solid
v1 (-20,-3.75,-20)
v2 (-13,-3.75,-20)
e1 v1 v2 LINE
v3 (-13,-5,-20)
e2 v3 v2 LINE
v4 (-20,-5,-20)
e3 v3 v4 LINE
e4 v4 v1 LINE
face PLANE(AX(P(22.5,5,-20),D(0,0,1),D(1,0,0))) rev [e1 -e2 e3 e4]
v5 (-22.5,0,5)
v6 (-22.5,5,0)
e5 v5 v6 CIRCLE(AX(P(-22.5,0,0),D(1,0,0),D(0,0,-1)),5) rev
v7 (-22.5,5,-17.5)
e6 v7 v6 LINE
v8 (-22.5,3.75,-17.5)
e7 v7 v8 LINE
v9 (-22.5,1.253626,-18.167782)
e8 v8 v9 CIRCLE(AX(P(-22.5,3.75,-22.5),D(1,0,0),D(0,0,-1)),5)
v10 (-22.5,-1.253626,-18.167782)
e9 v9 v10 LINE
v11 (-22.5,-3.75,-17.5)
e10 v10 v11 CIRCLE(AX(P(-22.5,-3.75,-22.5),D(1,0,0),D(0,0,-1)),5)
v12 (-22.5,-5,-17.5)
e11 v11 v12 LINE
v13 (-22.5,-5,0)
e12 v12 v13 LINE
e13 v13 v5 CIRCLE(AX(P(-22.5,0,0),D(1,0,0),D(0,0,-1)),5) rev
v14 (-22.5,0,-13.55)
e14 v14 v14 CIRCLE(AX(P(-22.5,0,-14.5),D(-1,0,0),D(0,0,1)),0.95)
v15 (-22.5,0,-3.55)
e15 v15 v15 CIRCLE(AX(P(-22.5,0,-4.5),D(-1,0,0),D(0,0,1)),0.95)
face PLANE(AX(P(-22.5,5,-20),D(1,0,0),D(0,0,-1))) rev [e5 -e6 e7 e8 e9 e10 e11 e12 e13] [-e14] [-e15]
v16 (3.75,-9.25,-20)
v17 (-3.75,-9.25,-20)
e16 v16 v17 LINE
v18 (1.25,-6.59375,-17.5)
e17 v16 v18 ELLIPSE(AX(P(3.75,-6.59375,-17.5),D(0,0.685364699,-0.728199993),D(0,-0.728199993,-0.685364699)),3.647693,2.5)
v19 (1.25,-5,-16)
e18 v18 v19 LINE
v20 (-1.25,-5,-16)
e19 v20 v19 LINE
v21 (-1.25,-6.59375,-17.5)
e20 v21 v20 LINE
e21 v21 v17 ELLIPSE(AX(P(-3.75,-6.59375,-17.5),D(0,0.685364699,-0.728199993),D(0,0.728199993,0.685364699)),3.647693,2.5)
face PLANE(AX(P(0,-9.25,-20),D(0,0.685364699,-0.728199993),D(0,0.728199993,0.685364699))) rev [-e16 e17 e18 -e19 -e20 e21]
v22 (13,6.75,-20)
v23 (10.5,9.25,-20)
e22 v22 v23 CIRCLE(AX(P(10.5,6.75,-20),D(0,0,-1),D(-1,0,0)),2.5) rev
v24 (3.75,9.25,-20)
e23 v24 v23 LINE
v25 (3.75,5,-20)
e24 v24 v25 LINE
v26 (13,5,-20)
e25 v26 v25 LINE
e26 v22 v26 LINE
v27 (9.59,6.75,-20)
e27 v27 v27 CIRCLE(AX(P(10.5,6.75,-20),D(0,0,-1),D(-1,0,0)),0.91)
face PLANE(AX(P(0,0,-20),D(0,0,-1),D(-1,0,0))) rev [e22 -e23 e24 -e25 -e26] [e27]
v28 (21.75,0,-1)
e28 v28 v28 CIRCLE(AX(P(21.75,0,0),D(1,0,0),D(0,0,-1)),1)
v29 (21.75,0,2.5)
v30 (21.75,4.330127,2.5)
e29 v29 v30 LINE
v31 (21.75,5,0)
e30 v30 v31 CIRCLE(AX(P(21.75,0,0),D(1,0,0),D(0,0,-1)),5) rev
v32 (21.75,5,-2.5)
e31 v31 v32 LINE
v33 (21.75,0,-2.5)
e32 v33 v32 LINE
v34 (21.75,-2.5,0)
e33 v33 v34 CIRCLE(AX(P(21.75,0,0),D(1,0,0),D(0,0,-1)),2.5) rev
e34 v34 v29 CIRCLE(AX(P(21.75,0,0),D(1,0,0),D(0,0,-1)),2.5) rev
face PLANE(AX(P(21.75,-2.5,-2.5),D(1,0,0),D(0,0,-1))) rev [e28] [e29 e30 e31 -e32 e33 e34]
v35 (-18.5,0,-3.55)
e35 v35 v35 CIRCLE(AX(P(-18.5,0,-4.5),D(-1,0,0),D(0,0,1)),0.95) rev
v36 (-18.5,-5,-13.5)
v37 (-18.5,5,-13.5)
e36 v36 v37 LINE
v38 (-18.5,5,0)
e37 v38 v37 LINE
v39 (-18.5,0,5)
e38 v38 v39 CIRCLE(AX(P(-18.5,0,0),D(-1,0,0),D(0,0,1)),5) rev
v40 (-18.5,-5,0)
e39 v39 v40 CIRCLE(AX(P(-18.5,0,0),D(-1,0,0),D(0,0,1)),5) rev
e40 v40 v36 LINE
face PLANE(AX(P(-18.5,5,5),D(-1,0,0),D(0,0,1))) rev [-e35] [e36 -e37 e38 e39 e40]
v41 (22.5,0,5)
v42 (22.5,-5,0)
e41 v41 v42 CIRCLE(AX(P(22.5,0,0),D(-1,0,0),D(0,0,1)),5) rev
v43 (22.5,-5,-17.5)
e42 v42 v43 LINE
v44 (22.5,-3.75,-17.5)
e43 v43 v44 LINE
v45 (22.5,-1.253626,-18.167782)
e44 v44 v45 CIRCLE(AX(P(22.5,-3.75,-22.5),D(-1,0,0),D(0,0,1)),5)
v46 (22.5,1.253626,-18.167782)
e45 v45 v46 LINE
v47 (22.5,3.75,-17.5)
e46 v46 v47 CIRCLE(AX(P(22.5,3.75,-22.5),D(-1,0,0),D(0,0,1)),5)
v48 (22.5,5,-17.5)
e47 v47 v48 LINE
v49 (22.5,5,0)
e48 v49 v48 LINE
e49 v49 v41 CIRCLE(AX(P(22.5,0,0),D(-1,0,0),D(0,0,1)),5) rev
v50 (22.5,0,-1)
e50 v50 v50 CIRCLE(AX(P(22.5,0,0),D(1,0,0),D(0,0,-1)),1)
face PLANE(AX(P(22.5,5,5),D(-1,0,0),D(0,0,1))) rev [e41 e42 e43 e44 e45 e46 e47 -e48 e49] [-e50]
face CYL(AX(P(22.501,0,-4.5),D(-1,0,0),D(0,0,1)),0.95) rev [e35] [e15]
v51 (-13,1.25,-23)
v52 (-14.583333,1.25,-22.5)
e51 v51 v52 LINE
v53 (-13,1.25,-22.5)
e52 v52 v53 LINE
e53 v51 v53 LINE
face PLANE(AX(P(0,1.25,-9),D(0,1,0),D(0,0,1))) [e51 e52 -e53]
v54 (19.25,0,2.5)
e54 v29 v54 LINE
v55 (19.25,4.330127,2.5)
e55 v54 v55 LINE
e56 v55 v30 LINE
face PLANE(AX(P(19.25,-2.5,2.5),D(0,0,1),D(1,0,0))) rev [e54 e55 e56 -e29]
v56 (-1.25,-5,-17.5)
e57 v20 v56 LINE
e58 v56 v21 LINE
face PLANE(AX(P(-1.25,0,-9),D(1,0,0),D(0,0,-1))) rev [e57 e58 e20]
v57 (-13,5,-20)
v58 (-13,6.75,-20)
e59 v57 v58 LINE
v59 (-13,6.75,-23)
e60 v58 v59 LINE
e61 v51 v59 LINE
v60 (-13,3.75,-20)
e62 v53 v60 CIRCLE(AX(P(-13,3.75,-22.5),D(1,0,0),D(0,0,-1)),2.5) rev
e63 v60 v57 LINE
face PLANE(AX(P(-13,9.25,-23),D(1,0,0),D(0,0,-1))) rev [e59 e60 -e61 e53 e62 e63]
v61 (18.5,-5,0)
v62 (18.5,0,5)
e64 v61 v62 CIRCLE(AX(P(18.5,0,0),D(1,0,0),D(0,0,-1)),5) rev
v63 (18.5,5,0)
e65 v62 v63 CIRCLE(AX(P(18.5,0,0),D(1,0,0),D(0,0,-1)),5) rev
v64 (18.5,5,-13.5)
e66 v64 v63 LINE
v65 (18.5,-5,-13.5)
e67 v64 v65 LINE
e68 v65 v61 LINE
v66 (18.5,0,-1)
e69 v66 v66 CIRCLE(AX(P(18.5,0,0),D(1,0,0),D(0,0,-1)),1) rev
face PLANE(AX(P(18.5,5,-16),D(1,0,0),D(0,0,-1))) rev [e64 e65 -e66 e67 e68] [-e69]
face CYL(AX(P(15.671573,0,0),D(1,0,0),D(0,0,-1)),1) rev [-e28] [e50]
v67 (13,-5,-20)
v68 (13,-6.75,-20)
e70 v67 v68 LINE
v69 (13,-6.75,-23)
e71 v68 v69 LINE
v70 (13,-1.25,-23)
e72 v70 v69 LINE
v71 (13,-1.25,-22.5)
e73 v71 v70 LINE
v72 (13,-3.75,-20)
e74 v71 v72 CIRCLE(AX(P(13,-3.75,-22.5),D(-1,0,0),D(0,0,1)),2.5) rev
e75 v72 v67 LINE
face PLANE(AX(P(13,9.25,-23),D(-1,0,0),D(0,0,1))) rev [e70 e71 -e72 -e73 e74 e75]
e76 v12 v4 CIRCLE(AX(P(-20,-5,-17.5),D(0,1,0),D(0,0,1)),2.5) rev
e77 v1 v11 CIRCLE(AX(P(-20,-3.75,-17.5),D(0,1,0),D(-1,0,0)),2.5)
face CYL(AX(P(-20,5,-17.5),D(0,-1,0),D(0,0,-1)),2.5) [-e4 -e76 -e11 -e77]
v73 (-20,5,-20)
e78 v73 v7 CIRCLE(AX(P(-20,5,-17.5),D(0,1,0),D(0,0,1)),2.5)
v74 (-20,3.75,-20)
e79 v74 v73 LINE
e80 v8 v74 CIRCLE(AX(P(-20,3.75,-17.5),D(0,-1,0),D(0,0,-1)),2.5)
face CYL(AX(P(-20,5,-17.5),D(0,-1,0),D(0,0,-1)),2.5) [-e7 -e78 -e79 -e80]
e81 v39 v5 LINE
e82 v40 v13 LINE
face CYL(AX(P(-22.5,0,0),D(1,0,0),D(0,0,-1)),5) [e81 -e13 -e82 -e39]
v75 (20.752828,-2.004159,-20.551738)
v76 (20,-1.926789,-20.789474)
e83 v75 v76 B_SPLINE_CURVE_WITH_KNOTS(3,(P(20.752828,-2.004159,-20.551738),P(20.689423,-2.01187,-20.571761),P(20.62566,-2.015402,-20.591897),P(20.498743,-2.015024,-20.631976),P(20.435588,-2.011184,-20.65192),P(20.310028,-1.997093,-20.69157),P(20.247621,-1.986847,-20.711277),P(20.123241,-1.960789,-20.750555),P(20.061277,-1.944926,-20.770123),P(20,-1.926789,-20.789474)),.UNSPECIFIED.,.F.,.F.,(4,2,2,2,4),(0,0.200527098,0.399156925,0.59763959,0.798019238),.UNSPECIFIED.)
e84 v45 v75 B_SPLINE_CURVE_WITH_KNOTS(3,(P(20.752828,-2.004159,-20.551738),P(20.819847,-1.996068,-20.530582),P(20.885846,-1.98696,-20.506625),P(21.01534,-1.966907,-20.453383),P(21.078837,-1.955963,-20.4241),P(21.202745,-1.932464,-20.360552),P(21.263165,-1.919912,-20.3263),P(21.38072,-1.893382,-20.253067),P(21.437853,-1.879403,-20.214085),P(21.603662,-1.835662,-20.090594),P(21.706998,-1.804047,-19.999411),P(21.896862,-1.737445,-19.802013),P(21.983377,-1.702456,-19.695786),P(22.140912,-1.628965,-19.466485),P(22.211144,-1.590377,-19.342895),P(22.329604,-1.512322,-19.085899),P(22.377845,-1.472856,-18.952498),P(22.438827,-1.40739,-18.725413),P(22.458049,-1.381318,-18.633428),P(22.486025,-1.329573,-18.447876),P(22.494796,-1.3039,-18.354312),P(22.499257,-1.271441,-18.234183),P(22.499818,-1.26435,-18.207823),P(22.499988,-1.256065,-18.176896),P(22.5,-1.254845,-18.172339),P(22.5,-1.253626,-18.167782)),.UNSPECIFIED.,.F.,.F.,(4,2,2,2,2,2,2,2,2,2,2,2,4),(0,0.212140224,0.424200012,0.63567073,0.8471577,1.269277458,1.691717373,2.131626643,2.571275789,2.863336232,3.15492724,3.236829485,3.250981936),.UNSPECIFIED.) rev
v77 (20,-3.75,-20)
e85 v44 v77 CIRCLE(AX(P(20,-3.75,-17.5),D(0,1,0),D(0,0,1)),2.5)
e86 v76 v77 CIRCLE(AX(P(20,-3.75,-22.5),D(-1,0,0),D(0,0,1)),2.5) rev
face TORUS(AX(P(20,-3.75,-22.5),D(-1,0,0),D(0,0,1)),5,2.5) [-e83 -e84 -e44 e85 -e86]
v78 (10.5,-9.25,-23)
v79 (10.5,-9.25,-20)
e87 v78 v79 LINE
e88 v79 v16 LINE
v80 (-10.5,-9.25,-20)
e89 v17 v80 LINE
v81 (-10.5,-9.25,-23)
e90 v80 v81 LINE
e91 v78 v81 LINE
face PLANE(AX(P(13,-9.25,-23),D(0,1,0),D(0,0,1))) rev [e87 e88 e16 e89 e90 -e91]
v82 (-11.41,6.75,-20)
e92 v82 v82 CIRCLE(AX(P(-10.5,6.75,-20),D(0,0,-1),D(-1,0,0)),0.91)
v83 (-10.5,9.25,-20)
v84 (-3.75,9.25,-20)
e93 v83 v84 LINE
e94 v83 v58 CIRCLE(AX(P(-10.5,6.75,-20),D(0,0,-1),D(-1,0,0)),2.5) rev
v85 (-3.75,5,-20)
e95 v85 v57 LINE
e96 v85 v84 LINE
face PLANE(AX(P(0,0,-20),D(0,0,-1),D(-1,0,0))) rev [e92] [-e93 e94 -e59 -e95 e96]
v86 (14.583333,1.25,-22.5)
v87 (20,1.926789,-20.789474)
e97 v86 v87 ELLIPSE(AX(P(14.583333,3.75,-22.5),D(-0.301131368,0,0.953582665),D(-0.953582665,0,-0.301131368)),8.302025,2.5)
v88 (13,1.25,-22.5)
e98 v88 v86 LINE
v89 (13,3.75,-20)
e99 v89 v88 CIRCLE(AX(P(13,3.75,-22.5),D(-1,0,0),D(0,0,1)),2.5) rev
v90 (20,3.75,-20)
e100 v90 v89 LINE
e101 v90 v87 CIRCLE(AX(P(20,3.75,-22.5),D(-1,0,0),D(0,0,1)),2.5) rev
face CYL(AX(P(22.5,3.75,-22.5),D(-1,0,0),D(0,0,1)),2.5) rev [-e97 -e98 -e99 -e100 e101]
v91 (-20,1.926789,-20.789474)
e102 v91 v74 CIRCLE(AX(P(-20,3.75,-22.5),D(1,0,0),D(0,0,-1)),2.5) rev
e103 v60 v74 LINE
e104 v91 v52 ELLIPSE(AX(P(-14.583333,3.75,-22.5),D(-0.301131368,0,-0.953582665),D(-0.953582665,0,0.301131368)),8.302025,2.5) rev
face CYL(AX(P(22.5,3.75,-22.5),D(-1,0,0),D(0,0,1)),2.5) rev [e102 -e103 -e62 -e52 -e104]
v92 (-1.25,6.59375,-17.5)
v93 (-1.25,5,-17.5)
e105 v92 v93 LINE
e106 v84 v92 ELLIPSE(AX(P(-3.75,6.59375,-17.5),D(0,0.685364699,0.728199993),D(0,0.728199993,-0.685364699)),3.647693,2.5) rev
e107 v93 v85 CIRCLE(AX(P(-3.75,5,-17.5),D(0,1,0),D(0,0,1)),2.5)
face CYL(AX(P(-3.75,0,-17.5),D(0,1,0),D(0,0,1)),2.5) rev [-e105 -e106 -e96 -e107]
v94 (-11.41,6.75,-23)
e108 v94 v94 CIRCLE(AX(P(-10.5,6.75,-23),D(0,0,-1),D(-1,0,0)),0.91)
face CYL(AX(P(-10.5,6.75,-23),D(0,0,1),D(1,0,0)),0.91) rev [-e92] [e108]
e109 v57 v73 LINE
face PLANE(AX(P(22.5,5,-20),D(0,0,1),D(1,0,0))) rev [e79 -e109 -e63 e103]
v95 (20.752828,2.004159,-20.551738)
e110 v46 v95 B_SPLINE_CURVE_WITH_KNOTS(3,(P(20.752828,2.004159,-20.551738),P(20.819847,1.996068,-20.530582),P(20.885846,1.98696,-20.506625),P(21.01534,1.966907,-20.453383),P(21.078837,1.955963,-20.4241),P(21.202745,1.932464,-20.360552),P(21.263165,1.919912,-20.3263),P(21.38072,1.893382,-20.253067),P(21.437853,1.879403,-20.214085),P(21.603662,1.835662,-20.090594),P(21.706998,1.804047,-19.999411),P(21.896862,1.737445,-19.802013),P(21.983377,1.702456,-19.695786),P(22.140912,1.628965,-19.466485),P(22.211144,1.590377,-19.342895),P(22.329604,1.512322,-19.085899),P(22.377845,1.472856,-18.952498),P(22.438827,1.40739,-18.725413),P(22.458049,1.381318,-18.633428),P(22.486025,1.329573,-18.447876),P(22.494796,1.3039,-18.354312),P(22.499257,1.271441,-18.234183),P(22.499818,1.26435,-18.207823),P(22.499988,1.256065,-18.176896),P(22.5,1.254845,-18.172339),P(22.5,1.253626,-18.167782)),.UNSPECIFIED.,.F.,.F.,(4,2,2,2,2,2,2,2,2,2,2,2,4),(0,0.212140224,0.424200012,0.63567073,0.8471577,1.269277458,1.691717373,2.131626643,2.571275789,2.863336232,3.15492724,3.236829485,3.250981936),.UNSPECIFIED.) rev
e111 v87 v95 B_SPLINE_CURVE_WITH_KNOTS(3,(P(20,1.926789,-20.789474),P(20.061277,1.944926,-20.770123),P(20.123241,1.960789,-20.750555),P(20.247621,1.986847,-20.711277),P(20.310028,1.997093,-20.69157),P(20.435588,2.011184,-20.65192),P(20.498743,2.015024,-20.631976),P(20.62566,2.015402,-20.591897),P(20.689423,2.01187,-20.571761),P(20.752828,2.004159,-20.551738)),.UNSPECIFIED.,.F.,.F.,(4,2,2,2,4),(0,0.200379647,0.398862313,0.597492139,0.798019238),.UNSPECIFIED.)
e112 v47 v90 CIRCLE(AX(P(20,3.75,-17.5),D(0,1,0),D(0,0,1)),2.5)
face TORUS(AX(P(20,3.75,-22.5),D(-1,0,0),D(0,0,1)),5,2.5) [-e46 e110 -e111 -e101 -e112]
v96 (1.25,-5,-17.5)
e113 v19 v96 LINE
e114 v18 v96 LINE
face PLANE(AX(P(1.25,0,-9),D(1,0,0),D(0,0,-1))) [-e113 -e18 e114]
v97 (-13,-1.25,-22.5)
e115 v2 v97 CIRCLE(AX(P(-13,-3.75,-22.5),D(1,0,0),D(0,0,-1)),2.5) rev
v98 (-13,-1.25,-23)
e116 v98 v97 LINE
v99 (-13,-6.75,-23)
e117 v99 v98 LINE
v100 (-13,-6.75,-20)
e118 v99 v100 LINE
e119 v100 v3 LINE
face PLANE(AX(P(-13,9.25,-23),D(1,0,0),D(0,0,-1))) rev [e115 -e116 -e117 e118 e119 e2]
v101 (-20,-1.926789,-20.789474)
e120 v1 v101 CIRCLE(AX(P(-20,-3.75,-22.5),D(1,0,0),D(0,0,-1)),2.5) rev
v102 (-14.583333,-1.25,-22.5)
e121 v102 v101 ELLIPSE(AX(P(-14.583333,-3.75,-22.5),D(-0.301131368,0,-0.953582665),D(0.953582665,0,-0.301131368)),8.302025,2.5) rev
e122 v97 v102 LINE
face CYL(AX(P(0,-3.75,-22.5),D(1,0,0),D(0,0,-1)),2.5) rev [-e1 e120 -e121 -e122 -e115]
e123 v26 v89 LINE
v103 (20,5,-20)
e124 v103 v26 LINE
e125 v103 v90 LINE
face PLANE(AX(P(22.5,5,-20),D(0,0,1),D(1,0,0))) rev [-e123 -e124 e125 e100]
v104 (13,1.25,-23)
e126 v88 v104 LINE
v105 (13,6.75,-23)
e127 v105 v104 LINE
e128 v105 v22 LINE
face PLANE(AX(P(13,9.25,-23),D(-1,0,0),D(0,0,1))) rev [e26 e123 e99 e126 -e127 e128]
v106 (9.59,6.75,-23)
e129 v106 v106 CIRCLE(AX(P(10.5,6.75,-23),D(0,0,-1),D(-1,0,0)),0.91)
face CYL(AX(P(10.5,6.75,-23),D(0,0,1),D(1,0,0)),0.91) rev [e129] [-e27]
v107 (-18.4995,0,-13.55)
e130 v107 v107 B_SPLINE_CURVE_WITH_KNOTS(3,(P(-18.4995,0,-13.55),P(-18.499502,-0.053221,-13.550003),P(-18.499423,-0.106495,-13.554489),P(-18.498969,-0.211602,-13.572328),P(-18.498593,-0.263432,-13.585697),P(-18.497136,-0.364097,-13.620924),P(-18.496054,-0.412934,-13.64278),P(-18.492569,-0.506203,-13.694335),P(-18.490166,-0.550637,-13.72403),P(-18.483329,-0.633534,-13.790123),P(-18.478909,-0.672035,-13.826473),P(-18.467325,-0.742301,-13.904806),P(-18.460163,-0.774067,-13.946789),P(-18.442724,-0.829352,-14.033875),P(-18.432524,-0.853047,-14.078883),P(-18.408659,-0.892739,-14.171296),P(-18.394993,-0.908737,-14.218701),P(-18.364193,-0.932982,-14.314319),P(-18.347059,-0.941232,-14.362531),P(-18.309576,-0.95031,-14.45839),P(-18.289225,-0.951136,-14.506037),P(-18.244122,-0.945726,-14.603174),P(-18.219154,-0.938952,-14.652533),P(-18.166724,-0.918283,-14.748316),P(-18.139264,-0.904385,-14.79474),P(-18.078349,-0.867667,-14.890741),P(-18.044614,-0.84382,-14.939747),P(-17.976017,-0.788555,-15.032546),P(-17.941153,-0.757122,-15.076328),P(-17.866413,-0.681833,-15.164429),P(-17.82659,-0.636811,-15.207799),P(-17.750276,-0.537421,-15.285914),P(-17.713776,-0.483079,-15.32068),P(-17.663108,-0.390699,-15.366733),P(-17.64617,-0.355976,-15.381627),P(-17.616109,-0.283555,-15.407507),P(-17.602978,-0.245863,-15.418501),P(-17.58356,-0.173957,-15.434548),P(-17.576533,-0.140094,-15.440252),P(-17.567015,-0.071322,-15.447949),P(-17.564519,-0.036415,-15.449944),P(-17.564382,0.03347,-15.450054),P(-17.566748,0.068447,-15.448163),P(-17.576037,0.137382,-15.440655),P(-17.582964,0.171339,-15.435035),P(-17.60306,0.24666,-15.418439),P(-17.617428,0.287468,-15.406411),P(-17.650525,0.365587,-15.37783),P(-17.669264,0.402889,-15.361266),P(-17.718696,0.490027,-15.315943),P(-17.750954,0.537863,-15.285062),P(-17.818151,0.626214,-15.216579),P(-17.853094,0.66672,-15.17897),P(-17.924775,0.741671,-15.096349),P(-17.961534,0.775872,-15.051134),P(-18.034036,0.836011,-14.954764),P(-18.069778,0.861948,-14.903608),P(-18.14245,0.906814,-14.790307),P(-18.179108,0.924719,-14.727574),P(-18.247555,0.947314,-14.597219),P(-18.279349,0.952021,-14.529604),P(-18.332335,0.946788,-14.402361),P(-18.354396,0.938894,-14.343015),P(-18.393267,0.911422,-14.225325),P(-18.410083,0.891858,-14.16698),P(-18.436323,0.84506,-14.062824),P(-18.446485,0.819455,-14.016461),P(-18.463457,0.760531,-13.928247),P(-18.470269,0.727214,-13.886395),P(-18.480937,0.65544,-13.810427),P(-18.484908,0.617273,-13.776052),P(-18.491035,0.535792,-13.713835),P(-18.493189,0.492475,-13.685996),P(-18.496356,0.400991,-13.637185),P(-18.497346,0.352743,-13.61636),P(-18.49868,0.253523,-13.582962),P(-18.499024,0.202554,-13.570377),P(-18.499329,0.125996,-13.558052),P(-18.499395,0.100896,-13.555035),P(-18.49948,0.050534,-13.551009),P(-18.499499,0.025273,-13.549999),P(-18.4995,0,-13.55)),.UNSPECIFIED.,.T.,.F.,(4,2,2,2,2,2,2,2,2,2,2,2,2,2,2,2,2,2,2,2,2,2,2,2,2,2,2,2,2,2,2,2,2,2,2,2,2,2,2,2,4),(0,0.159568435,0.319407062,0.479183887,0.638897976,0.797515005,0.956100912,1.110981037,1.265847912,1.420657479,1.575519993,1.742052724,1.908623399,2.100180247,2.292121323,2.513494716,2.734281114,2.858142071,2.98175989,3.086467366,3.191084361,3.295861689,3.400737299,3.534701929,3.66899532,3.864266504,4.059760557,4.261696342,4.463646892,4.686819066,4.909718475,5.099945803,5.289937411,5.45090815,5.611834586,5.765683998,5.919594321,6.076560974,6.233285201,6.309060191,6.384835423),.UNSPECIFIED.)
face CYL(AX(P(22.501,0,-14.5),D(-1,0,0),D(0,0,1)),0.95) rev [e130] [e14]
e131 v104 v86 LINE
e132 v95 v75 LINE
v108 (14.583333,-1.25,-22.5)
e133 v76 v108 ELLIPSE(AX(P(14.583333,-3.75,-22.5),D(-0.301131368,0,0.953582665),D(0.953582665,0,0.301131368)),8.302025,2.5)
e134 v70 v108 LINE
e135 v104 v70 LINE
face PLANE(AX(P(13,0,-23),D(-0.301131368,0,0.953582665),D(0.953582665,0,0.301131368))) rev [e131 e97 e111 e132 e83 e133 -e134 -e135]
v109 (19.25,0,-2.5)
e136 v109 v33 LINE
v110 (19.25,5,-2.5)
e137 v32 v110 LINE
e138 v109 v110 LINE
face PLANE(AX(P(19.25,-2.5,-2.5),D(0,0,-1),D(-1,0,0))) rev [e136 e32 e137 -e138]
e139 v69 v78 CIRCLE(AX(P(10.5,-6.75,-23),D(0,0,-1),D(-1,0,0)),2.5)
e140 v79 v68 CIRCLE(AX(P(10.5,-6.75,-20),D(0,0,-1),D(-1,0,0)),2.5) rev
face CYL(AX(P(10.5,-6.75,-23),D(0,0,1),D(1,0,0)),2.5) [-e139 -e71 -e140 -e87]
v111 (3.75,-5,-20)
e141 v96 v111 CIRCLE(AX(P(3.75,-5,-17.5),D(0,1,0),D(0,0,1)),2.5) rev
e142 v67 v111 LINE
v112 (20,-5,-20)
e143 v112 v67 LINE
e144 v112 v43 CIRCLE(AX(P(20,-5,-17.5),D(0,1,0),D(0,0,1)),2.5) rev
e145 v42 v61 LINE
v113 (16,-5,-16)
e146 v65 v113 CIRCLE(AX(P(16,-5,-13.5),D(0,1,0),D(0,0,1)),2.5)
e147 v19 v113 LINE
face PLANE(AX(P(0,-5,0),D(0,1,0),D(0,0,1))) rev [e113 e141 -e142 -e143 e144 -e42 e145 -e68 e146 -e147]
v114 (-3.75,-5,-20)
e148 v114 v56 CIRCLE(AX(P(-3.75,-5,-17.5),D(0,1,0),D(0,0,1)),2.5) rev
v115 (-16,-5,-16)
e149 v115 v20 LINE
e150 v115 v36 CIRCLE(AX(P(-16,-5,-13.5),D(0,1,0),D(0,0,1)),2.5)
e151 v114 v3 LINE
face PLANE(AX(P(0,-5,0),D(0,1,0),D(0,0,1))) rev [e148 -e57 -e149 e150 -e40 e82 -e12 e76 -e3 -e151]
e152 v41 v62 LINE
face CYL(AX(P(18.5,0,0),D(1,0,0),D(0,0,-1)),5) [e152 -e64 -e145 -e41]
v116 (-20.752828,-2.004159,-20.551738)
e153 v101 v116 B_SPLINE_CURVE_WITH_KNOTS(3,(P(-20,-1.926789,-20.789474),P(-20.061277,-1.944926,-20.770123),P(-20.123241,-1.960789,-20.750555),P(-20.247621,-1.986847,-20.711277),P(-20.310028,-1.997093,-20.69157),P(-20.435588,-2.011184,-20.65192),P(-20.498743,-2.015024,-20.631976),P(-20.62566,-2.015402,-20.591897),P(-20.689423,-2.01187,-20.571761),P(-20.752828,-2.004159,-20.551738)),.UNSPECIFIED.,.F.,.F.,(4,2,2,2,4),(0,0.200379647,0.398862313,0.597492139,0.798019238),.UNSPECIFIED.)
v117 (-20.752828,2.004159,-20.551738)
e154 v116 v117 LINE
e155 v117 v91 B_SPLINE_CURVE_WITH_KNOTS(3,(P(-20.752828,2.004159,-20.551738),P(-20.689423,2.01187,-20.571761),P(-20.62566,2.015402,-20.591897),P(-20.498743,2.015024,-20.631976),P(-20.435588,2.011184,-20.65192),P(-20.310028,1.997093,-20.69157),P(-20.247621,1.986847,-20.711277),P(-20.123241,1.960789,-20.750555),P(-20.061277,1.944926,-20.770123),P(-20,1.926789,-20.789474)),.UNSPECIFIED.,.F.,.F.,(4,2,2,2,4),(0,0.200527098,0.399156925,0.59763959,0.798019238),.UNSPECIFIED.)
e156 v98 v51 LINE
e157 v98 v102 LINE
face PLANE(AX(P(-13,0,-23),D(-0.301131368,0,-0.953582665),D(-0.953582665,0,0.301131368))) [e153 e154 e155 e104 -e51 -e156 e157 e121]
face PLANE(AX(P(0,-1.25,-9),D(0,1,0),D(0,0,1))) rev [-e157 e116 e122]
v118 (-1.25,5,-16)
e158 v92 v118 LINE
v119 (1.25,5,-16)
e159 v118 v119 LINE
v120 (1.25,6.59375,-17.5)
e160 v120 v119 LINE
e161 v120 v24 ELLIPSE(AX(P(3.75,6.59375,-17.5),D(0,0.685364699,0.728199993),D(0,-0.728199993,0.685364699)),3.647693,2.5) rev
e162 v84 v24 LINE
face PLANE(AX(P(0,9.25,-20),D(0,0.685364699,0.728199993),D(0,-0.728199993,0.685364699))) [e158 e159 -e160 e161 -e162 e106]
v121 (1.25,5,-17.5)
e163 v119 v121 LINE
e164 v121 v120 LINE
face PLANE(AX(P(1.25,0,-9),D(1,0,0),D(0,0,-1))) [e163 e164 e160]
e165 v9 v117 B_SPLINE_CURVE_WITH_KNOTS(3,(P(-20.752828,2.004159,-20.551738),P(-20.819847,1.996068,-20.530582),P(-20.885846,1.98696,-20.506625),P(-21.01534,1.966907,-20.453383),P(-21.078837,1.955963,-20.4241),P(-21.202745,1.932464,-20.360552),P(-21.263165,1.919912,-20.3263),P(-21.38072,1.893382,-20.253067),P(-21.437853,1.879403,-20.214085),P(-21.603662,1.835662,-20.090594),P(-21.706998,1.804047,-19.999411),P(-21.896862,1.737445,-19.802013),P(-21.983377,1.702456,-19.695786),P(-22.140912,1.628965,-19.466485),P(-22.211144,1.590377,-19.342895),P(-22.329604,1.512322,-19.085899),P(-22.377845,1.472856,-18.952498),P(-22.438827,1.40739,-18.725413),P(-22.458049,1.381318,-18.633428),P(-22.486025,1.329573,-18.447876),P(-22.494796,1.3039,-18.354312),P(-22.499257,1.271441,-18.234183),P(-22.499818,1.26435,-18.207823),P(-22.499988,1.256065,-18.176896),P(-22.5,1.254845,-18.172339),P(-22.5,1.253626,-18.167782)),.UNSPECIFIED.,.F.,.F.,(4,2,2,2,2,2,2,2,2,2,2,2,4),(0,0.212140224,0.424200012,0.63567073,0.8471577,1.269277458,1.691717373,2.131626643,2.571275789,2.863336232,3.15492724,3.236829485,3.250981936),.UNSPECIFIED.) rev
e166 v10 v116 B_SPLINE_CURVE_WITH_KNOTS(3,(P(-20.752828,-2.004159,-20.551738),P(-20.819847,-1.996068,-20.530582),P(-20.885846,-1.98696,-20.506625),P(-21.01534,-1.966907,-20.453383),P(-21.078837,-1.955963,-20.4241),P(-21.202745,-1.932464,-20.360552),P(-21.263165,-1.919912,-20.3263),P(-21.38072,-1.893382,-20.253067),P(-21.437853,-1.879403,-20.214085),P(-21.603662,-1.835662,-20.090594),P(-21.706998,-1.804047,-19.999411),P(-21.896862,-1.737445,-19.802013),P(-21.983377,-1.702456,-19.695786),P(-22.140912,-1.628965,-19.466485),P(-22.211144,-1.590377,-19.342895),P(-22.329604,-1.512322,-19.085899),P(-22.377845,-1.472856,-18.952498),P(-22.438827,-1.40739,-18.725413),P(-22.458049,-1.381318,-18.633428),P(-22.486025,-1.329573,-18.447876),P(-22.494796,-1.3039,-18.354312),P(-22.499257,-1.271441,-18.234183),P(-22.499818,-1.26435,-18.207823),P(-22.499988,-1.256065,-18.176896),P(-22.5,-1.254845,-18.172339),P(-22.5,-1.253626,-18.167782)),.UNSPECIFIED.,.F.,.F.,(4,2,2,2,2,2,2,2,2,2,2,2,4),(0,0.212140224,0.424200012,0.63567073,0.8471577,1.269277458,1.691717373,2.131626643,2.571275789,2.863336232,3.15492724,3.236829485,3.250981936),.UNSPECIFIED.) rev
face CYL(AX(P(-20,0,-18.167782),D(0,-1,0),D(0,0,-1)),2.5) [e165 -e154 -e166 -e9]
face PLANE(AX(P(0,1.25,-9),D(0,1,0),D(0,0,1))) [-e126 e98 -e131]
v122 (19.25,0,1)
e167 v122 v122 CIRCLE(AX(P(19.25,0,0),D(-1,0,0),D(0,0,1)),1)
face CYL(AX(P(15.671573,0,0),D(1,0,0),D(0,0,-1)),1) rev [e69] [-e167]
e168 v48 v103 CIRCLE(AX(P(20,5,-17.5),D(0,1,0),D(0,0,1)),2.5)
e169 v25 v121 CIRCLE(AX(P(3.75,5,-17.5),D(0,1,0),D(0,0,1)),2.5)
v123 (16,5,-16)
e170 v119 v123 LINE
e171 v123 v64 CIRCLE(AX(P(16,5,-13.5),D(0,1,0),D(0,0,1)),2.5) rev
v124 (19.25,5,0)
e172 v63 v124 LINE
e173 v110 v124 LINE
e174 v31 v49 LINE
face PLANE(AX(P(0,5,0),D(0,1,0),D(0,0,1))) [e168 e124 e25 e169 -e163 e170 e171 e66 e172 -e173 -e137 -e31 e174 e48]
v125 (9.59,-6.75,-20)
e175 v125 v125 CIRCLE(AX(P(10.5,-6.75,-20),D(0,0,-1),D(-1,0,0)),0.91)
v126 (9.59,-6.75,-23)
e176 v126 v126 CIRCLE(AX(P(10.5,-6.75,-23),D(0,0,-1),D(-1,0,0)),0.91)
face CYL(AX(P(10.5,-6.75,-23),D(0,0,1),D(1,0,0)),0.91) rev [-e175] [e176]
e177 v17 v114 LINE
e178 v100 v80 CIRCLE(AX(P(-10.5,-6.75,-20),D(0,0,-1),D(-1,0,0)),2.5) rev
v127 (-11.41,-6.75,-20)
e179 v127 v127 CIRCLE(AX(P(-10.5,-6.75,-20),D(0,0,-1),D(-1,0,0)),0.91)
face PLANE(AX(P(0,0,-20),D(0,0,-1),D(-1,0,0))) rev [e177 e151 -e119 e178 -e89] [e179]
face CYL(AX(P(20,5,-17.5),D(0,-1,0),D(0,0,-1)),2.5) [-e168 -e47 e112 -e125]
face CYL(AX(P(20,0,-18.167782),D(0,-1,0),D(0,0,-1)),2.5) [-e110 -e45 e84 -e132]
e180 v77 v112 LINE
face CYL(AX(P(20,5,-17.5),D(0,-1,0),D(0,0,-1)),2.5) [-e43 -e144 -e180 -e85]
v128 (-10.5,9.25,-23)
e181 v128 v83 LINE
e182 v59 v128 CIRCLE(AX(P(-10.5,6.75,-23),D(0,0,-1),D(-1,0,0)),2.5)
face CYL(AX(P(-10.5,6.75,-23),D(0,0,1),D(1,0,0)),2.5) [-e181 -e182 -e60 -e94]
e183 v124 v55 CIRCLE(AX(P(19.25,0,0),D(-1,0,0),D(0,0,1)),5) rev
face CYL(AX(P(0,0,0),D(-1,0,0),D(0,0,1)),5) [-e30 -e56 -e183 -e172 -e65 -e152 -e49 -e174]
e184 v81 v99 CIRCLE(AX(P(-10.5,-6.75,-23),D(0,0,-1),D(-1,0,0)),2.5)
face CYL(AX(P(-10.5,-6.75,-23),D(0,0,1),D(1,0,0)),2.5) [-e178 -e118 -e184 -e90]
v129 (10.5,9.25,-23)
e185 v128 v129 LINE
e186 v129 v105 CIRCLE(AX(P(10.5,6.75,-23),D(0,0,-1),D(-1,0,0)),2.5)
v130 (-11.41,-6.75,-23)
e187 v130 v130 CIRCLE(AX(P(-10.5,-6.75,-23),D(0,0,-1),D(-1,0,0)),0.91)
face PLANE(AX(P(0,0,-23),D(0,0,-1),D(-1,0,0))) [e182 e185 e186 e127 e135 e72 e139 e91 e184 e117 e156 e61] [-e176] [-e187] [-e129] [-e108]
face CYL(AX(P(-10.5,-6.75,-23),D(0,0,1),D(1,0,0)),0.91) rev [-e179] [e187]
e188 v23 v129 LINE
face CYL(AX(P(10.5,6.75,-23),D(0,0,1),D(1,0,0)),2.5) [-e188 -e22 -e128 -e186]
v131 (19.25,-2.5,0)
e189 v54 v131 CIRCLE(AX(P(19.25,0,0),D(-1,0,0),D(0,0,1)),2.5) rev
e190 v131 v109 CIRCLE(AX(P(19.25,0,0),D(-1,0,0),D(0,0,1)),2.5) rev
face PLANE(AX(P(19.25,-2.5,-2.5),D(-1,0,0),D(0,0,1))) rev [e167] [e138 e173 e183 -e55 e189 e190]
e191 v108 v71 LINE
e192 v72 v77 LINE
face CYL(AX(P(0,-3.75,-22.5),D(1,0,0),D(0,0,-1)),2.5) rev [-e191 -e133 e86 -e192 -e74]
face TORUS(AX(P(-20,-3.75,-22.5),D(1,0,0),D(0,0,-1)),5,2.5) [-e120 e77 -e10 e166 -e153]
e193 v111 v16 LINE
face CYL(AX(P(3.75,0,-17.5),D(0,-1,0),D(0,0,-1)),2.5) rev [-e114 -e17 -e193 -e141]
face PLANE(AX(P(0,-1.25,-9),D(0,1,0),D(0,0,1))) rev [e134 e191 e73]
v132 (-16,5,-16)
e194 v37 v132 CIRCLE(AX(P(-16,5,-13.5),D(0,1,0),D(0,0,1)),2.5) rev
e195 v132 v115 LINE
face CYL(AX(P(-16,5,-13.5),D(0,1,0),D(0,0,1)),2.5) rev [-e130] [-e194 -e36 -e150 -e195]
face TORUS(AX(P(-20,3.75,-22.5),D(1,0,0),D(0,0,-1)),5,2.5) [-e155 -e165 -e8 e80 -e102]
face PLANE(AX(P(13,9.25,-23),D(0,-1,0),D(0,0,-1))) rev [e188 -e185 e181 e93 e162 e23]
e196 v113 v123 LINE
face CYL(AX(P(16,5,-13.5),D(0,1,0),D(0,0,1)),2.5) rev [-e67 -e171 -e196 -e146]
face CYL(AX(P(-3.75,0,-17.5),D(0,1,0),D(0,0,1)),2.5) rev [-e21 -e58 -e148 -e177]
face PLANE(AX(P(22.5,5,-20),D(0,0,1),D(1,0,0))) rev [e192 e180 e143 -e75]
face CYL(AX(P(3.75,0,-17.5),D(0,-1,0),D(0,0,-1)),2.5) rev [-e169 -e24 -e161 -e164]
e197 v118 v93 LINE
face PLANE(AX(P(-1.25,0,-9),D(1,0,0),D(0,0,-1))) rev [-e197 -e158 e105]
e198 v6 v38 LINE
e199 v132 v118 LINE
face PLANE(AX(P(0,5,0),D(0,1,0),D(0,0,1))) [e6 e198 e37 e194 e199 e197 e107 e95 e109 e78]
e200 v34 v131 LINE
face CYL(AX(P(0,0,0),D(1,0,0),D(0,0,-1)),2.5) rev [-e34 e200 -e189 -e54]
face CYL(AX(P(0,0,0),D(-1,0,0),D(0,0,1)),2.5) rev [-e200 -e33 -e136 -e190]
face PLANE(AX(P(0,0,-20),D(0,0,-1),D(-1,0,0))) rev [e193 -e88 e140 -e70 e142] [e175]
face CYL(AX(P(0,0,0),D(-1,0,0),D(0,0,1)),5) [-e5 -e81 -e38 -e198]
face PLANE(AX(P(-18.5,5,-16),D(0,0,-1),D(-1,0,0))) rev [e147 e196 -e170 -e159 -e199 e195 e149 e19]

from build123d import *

# Parameters (mm, degrees)
BOSS_EXTRU_1_DEPTH      = 5
ESQUISSE4_W             = 2.5
ESQUISSE4_H             = 5
ENL_V_MAT_EXTRU_1_DEPTH = 7.5
ENL_V_MAT_EXTRU_2_REACH = 51.497
ESQUISSE5_R             = 1
CONG_1_R                = 2.5
CONG_2_R                = 5
ESQUISSE6_W             = 26
ESQUISSE6_H             = 18.5
ESQUISSE6_R             = 0.91
BOSS_EXTRU_2_DEPTH      = 3
NERVURE4_REACH          = 35.479
ESQUISSE7_WALL_W        = 74.793384568
ESQUISSE7_WALL_H        = 2.5
NERVURE5_REACH          = 35.479
ESQUISSE8_WALL_W        = 78.919505224
ESQUISSE8_WALL_H        = 2.5
CONG_3_R                = 2.5
CONG_4_START            = -2.015218214
CONG_4_3_DEPTH          = 4.030436428
CONG_4_START_2          = 3.7499999
CONG_4_4_DEPTH          = 1.2500001
CONG_4_START_3          = -5
CONG_4_5_DEPTH          = 1.25
CONG_4_6_DEPTH          = 10
ENL_V_MAT_EXTRU_3_REACH = 53.377
ESQUISSE9_R             = 0.95


with BuildPart() as part:
    # Esquisse2 → Boss.-Extru.1 (new, symmetric)
    with BuildSketch(Plane(origin=(0, 0, 0), x_dir=(1, 0, 0), z_dir=(0, 1, 0))):
        Polygon((-18.5, -5), (-18.5, 16), (18.5, 16), (18.5, -5), (22.5, -5), (22.5, 20), (-22.5, 20), (-22.5, -5), align=None)
    extrude(amount=BOSS_EXTRU_1_DEPTH, both=True)

    # Esquisse4 → Enlèv. mat.-Extru.1 (cut)
    with BuildSketch(Plane(origin=(0, 5, 0), x_dir=(1, 0, 0), z_dir=(0, 1, 0))):
        with Locations((20.5, 0)):
            Rectangle(ESQUISSE4_W, ESQUISSE4_H)
    extrude(amount=-ENL_V_MAT_EXTRU_1_DEPTH, mode=Mode.SUBTRACT)

    # Enlèv. mat.-Extru.2: up to this face of the body (flat: up to its plane)
    enl_v_mat_extru_2_end = Plane(part.part.faces().sort_by_distance((18.5, 0, -5.5))[0])
    # Esquisse5 → Enlèv. mat.-Extru.2 (cut, up to the picked face)
    with BuildSketch(Plane(origin=(22.5, 0, 0), x_dir=(0, 0, -1), z_dir=(1, 0, 0)), mode=Mode.PRIVATE) as enl_v_mat_extru_2_sk1:
        Circle(ESQUISSE5_R)
    enl_v_mat_extru_2_tool1 = split(extrude(enl_v_mat_extru_2_sk1.sketch, amount=-ENL_V_MAT_EXTRU_2_REACH, mode=Mode.PRIVATE), bisect_by=enl_v_mat_extru_2_end, keep=Keep.BOTH, mode=Mode.PRIVATE)
    add(enl_v_mat_extru_2_tool1.solids().sort_by(Axis((22.5, 0, 0), (-1, 0, 0)))[0], mode=Mode.SUBTRACT)

    # Congé1
    cong_1_edges = [part.edges().sort_by_distance(p)[0] for p in [
        (20.5, -2.5, 2.5),
        (20.5, -2.5, -2.5),
    ]]
    fillet(cong_1_edges, radius=CONG_1_R - 0.0001)  # a hair under: the kernel refuses the full size

    # Congé2
    # the kernel refuses this fillet: 5 mm, written as the material it takes off along each edge
    with BuildSketch(Plane(origin=(-35, -5, 5), x_dir=(0, 1, 0), z_dir=(1, 0, 0)), Plane(origin=(-35, 5, 5), x_dir=(0, 0, -1), z_dir=(1, 0, 0)), Plane(origin=(6, -5, 5), x_dir=(0, 1, 0), z_dir=(1, 0, 0)), Plane(origin=(6, 5, 5), x_dir=(0, 0, -1), z_dir=(1, 0, 0))) as cong_2_piece_1:
        with BuildLine():
            CenterArc((CONG_2_R, -CONG_2_R), CONG_2_R, 90, 90)
            Line((0, -CONG_2_R), (0, 0))
            Line((0, 0), (CONG_2_R, 0))
        make_face()
    extrude(amount=29, mode=Mode.SUBTRACT)

    # Esquisse6 → Boss.-Extru.2 (add)
    with BuildSketch(Plane(origin=(0, 0, -20), x_dir=(-1, 0, 0), z_dir=(0, 0, -1))):
        Rectangle(ESQUISSE6_W, ESQUISSE6_H)
        with Locations((-10.5, 6.75)):
            Circle(ESQUISSE6_R, mode=Mode.SUBTRACT)
        with Locations((10.5, 6.75)):
            Circle(ESQUISSE6_R, mode=Mode.SUBTRACT)
        with Locations((10.5, -6.75)):
            Circle(ESQUISSE6_R, mode=Mode.SUBTRACT)
        with Locations((-10.5, -6.75)):
            Circle(ESQUISSE6_R, mode=Mode.SUBTRACT)
    extrude(amount=BOSS_EXTRU_2_DEPTH)

    # Esquisse7 wall → Nervure4 (add, up to next)
    with BuildSketch(Plane(origin=(0, 7.125, -18), x_dir=(0, -0.728199992693, 0.685364699005), z_dir=(0, -0.685364699005, -0.728199992693)), mode=Mode.PRIVATE) as nervure4_sk1:
        Rectangle(ESQUISSE7_WALL_W, ESQUISSE7_WALL_H)
    nervure4_tool1 = extrude(nervure4_sk1.sketch, amount=NERVURE4_REACH, mode=Mode.PRIVATE) - part.part
    nervure4 = nervure4_tool1.solids().sort_by_distance((0, 7.125, -18))[0]
    add(nervure4)

    # Symétrie1: Nervure4 across plane
    add(nervure4.mirror(Plane.ZX))

    # Esquisse8 wall → Nervure5 (add, up to next)
    with BuildSketch(Plane(origin=(17.75, 0, -21.5), x_dir=(0.953582665134, 0, 0.301131367937), z_dir=(0.301131367937, 0, -0.953582665134)), mode=Mode.PRIVATE) as nervure5_sk1:
        Rectangle(ESQUISSE8_WALL_W, ESQUISSE8_WALL_H)
    nervure5_tool1 = extrude(nervure5_sk1.sketch, amount=-NERVURE5_REACH, mode=Mode.PRIVATE) - part.part
    nervure5 = nervure5_tool1.solids().sort_by_distance((17.75, 0, -21.5))[0]
    add(nervure5)

    # Symétrie2: Nervure5 across plane
    add(nervure5.mirror(Plane(origin=(0, 0, 0), x_dir=(0, 0, 1), z_dir=(1, 0, 0))))

    # Congé3
    cong_3_edges = [part.edges().sort_by_distance(p)[0] for p in [
        (1.25, 7.125, -20),
        (-1.25, 7.125, -20),
        (-1.25, -7.125, -20),
        (1.25, -7.125, -20),
        (17.75, 1.25, -20),
        (17.75, -1.25, -20),
        (-17.75, -1.25, -20),
        (-17.75, 1.25, -20),
        (-13, -9.25, -21.5),
        (-13, 9.25, -21.5),
        (13, 9.25, -21.5),
        (13, -9.25, -21.5),
    ]]
    fillet(cong_3_edges, radius=CONG_3_R)

    # Congé4: read off the stored shape, not the designer's step
    # Congé4 outline → Congé4 (revolve, cut)
    with BuildSketch(Plane(origin=(0, 3.75, -22.5), x_dir=(0, 1, 0), z_dir=(0, 0, -1))):
        with BuildLine():
            Line((2.5, 22.5), (2.5, 20))
            ThreePointArc((2.5, 20), (3.232233047, 21.767766953), (5, 22.5))
            Line((5, 22.5), (2.5, 22.5))
        make_face()
        with BuildLine():
            ThreePointArc((5, -22.5), (3.232233047, -21.767766953), (2.5, -20))
            Line((2.5, -20), (2.5, -22.5))
            Line((2.5, -22.5), (5, -22.5))
        make_face()
    revolve(axis=Axis((0, 3.75, -22.5), (1, 0, 0)), mode=Mode.SUBTRACT)

    # Cong_4 2 outline → Cong_4 2 (revolve, cut)
    with BuildSketch(Plane(origin=(0, -3.75, -22.5), x_dir=(0, 1, 0), z_dir=(0, 0, -1))):
        with BuildLine():
            Line((2.5, 22.5), (2.5, 20))
            ThreePointArc((2.5, 20), (3.232233047, 21.767766953), (5, 22.5))
            Line((5, 22.5), (2.5, 22.5))
        make_face()
        with BuildLine():
            ThreePointArc((5, -22.5), (3.232233047, -21.767766953), (2.5, -20))
            Line((2.5, -20), (2.5, -22.5))
            Line((2.5, -22.5), (5, -22.5))
        make_face()
    revolve(axis=Axis((0, -3.75, -22.5), (1, 0, 0)), mode=Mode.SUBTRACT)

    # Cong_4 3 outline → Cong_4 3 (cut)
    with BuildSketch(Plane(origin=(0, 0, 0), x_dir=(1, 0, 0), z_dir=(0, 1, 0)).offset(CONG_4_START)):
        with BuildLine():
            Line((22.5, 18.167781731), (22.5, 15.999999998))
            Line((22.5, 15.999999998), (24, 15.999999998))
            Line((24, 15.999999998), (24, 19.52631579))
            Line((24, 19.52631579), (22.449089048, 20.016077143))
            Line((22.449089048, 20.016077143), (20.75282842, 20.551738394))
            ThreePointArc((20.75282842, 20.551738394), (22.016441302, 19.645605968), (22.5, 18.167781731))
        make_face()
        with BuildLine():
            Line((-24, 15.999999998), (-22.5, 15.999999998))
            Line((-22.5, 15.999999998), (-22.5, 18.167781731))
            ThreePointArc((-22.5, 18.167781731), (-22.016441302, 19.645605968), (-20.75282842, 20.551738394))
            Line((-20.75282842, 20.551738394), (-22.449089048, 20.016077143))
            Line((-22.449089048, 20.016077143), (-24, 19.52631579))
            Line((-24, 19.52631579), (-24, 15.999999998))
        make_face()
    extrude(amount=CONG_4_3_DEPTH, mode=Mode.SUBTRACT)

    # Cong_4 4 outline → Cong_4 4 (cut)
    with BuildSketch(Plane(origin=(0, 0, 0), x_dir=(1, 0, 0), z_dir=(0, 1, 0)).offset(CONG_4_START_2)):
        with BuildLine():
            Line((18.5, 20), (20, 20))
            ThreePointArc((20, 20), (21.767766953, 19.267766953), (22.5, 17.5))
            Line((22.5, 17.5), (22.5, 18.167781731))
            ThreePointArc((22.5, 18.167781731), (22.016441302, 19.645605968), (20.75282842, 20.551738394))
            Line((20.75282842, 20.551738394), (18.5, 21.263157895))
            Line((18.5, 21.263157895), (18.5, 20))
        make_face()
        with BuildLine():
            Line((-18.5, 20), (-18.5, 21.263157895))
            Line((-18.5, 21.263157895), (-20.75282842, 20.551738394))
            ThreePointArc((-20.75282842, 20.551738394), (-22.016441302, 19.645605968), (-22.5, 18.167781731))
            Line((-22.5, 18.167781731), (-22.5, 17.5))
            ThreePointArc((-22.5, 17.5), (-21.767766953, 19.267766953), (-20, 20))
            Line((-20, 20), (-18.5, 20))
        make_face()
    extrude(amount=CONG_4_4_DEPTH, mode=Mode.SUBTRACT)

    # Cong_4 5 outline → Cong_4 5 (cut)
    with BuildSketch(Plane(origin=(0, 0, 0), x_dir=(1, 0, 0), z_dir=(0, 1, 0)).offset(CONG_4_START_3)):
        with BuildLine():
            Line((18.5, 20), (20, 20))
            ThreePointArc((20, 20), (21.767766953, 19.267766953), (22.5, 17.5))
            Line((22.5, 17.5), (22.5, 18.167781731))
            ThreePointArc((22.5, 18.167781731), (22.016441302, 19.645605968), (20.75282842, 20.551738394))
            Line((20.75282842, 20.551738394), (18.5, 21.263157895))
            Line((18.5, 21.263157895), (18.5, 20))
        make_face()
        with BuildLine():
            Line((-18.5, 20), (-18.5, 21.263157895))
            Line((-18.5, 21.263157895), (-20.75282842, 20.551738394))
            ThreePointArc((-20.75282842, 20.551738394), (-22.016441302, 19.645605968), (-22.5, 18.167781731))
            Line((-22.5, 18.167781731), (-22.5, 17.5))
            ThreePointArc((-22.5, 17.5), (-21.767766953, 19.267766953), (-20, 20))
            Line((-20, 20), (-18.5, 20))
        make_face()
    extrude(amount=CONG_4_5_DEPTH, mode=Mode.SUBTRACT)

    # Cong_4 6 outline → Cong_4 6 (add)
    with BuildSketch(Plane(origin=(0, 0, 0), x_dir=(1, 0, 0), z_dir=(0, 1, 0)).offset(CONG_4_START_3)):
        with BuildLine():
            Line((18.5, 13.5), (18.5, 16))
            Line((18.5, 16), (16, 16))
            ThreePointArc((16, 16), (17.767766953, 15.267766953), (18.5, 13.5))
        make_face()
        with BuildLine():
            ThreePointArc((-18.5, 13.5), (-17.767766953, 15.267766953), (-16, 16))
            Line((-16, 16), (-18.5, 15.999999998))
            Line((-18.5, 15.999999998), (-18.5, 13.5))
        make_face()
    extrude(amount=CONG_4_6_DEPTH)

    # Esquisse9 → Enlèv. mat.-Extru.3 (cut, up to next)
    with BuildSketch(Plane.ZY.offset(22.5), mode=Mode.PRIVATE) as enl_v_mat_extru_3_sk1:
        with Locations((-4.5, 0)):
            Circle(ESQUISSE9_R)
    enl_v_mat_extru_3_tool1 = extrude(enl_v_mat_extru_3_sk1.sketch, amount=-ENL_V_MAT_EXTRU_3_REACH, mode=Mode.PRIVATE) & part.part
    # Esquisse9 → Enlèv. mat.-Extru.3 (cut, up to next)
    with BuildSketch(Plane.ZY.offset(22.5), mode=Mode.PRIVATE) as enl_v_mat_extru_3_sk2:
        with Locations((-14.5, 0)):
            Circle(ESQUISSE9_R)
    enl_v_mat_extru_3_tool2 = extrude(enl_v_mat_extru_3_sk2.sketch, amount=-ENL_V_MAT_EXTRU_3_REACH, mode=Mode.PRIVATE) & part.part
    add(enl_v_mat_extru_3_tool1.solids().sort_by_distance((-22.5, 0, -4.5))[0], mode=Mode.SUBTRACT)
    add(enl_v_mat_extru_3_tool2.solids().sort_by_distance((-22.5, 0, -14.5))[0], mode=Mode.SUBTRACT)


solid = part.part
